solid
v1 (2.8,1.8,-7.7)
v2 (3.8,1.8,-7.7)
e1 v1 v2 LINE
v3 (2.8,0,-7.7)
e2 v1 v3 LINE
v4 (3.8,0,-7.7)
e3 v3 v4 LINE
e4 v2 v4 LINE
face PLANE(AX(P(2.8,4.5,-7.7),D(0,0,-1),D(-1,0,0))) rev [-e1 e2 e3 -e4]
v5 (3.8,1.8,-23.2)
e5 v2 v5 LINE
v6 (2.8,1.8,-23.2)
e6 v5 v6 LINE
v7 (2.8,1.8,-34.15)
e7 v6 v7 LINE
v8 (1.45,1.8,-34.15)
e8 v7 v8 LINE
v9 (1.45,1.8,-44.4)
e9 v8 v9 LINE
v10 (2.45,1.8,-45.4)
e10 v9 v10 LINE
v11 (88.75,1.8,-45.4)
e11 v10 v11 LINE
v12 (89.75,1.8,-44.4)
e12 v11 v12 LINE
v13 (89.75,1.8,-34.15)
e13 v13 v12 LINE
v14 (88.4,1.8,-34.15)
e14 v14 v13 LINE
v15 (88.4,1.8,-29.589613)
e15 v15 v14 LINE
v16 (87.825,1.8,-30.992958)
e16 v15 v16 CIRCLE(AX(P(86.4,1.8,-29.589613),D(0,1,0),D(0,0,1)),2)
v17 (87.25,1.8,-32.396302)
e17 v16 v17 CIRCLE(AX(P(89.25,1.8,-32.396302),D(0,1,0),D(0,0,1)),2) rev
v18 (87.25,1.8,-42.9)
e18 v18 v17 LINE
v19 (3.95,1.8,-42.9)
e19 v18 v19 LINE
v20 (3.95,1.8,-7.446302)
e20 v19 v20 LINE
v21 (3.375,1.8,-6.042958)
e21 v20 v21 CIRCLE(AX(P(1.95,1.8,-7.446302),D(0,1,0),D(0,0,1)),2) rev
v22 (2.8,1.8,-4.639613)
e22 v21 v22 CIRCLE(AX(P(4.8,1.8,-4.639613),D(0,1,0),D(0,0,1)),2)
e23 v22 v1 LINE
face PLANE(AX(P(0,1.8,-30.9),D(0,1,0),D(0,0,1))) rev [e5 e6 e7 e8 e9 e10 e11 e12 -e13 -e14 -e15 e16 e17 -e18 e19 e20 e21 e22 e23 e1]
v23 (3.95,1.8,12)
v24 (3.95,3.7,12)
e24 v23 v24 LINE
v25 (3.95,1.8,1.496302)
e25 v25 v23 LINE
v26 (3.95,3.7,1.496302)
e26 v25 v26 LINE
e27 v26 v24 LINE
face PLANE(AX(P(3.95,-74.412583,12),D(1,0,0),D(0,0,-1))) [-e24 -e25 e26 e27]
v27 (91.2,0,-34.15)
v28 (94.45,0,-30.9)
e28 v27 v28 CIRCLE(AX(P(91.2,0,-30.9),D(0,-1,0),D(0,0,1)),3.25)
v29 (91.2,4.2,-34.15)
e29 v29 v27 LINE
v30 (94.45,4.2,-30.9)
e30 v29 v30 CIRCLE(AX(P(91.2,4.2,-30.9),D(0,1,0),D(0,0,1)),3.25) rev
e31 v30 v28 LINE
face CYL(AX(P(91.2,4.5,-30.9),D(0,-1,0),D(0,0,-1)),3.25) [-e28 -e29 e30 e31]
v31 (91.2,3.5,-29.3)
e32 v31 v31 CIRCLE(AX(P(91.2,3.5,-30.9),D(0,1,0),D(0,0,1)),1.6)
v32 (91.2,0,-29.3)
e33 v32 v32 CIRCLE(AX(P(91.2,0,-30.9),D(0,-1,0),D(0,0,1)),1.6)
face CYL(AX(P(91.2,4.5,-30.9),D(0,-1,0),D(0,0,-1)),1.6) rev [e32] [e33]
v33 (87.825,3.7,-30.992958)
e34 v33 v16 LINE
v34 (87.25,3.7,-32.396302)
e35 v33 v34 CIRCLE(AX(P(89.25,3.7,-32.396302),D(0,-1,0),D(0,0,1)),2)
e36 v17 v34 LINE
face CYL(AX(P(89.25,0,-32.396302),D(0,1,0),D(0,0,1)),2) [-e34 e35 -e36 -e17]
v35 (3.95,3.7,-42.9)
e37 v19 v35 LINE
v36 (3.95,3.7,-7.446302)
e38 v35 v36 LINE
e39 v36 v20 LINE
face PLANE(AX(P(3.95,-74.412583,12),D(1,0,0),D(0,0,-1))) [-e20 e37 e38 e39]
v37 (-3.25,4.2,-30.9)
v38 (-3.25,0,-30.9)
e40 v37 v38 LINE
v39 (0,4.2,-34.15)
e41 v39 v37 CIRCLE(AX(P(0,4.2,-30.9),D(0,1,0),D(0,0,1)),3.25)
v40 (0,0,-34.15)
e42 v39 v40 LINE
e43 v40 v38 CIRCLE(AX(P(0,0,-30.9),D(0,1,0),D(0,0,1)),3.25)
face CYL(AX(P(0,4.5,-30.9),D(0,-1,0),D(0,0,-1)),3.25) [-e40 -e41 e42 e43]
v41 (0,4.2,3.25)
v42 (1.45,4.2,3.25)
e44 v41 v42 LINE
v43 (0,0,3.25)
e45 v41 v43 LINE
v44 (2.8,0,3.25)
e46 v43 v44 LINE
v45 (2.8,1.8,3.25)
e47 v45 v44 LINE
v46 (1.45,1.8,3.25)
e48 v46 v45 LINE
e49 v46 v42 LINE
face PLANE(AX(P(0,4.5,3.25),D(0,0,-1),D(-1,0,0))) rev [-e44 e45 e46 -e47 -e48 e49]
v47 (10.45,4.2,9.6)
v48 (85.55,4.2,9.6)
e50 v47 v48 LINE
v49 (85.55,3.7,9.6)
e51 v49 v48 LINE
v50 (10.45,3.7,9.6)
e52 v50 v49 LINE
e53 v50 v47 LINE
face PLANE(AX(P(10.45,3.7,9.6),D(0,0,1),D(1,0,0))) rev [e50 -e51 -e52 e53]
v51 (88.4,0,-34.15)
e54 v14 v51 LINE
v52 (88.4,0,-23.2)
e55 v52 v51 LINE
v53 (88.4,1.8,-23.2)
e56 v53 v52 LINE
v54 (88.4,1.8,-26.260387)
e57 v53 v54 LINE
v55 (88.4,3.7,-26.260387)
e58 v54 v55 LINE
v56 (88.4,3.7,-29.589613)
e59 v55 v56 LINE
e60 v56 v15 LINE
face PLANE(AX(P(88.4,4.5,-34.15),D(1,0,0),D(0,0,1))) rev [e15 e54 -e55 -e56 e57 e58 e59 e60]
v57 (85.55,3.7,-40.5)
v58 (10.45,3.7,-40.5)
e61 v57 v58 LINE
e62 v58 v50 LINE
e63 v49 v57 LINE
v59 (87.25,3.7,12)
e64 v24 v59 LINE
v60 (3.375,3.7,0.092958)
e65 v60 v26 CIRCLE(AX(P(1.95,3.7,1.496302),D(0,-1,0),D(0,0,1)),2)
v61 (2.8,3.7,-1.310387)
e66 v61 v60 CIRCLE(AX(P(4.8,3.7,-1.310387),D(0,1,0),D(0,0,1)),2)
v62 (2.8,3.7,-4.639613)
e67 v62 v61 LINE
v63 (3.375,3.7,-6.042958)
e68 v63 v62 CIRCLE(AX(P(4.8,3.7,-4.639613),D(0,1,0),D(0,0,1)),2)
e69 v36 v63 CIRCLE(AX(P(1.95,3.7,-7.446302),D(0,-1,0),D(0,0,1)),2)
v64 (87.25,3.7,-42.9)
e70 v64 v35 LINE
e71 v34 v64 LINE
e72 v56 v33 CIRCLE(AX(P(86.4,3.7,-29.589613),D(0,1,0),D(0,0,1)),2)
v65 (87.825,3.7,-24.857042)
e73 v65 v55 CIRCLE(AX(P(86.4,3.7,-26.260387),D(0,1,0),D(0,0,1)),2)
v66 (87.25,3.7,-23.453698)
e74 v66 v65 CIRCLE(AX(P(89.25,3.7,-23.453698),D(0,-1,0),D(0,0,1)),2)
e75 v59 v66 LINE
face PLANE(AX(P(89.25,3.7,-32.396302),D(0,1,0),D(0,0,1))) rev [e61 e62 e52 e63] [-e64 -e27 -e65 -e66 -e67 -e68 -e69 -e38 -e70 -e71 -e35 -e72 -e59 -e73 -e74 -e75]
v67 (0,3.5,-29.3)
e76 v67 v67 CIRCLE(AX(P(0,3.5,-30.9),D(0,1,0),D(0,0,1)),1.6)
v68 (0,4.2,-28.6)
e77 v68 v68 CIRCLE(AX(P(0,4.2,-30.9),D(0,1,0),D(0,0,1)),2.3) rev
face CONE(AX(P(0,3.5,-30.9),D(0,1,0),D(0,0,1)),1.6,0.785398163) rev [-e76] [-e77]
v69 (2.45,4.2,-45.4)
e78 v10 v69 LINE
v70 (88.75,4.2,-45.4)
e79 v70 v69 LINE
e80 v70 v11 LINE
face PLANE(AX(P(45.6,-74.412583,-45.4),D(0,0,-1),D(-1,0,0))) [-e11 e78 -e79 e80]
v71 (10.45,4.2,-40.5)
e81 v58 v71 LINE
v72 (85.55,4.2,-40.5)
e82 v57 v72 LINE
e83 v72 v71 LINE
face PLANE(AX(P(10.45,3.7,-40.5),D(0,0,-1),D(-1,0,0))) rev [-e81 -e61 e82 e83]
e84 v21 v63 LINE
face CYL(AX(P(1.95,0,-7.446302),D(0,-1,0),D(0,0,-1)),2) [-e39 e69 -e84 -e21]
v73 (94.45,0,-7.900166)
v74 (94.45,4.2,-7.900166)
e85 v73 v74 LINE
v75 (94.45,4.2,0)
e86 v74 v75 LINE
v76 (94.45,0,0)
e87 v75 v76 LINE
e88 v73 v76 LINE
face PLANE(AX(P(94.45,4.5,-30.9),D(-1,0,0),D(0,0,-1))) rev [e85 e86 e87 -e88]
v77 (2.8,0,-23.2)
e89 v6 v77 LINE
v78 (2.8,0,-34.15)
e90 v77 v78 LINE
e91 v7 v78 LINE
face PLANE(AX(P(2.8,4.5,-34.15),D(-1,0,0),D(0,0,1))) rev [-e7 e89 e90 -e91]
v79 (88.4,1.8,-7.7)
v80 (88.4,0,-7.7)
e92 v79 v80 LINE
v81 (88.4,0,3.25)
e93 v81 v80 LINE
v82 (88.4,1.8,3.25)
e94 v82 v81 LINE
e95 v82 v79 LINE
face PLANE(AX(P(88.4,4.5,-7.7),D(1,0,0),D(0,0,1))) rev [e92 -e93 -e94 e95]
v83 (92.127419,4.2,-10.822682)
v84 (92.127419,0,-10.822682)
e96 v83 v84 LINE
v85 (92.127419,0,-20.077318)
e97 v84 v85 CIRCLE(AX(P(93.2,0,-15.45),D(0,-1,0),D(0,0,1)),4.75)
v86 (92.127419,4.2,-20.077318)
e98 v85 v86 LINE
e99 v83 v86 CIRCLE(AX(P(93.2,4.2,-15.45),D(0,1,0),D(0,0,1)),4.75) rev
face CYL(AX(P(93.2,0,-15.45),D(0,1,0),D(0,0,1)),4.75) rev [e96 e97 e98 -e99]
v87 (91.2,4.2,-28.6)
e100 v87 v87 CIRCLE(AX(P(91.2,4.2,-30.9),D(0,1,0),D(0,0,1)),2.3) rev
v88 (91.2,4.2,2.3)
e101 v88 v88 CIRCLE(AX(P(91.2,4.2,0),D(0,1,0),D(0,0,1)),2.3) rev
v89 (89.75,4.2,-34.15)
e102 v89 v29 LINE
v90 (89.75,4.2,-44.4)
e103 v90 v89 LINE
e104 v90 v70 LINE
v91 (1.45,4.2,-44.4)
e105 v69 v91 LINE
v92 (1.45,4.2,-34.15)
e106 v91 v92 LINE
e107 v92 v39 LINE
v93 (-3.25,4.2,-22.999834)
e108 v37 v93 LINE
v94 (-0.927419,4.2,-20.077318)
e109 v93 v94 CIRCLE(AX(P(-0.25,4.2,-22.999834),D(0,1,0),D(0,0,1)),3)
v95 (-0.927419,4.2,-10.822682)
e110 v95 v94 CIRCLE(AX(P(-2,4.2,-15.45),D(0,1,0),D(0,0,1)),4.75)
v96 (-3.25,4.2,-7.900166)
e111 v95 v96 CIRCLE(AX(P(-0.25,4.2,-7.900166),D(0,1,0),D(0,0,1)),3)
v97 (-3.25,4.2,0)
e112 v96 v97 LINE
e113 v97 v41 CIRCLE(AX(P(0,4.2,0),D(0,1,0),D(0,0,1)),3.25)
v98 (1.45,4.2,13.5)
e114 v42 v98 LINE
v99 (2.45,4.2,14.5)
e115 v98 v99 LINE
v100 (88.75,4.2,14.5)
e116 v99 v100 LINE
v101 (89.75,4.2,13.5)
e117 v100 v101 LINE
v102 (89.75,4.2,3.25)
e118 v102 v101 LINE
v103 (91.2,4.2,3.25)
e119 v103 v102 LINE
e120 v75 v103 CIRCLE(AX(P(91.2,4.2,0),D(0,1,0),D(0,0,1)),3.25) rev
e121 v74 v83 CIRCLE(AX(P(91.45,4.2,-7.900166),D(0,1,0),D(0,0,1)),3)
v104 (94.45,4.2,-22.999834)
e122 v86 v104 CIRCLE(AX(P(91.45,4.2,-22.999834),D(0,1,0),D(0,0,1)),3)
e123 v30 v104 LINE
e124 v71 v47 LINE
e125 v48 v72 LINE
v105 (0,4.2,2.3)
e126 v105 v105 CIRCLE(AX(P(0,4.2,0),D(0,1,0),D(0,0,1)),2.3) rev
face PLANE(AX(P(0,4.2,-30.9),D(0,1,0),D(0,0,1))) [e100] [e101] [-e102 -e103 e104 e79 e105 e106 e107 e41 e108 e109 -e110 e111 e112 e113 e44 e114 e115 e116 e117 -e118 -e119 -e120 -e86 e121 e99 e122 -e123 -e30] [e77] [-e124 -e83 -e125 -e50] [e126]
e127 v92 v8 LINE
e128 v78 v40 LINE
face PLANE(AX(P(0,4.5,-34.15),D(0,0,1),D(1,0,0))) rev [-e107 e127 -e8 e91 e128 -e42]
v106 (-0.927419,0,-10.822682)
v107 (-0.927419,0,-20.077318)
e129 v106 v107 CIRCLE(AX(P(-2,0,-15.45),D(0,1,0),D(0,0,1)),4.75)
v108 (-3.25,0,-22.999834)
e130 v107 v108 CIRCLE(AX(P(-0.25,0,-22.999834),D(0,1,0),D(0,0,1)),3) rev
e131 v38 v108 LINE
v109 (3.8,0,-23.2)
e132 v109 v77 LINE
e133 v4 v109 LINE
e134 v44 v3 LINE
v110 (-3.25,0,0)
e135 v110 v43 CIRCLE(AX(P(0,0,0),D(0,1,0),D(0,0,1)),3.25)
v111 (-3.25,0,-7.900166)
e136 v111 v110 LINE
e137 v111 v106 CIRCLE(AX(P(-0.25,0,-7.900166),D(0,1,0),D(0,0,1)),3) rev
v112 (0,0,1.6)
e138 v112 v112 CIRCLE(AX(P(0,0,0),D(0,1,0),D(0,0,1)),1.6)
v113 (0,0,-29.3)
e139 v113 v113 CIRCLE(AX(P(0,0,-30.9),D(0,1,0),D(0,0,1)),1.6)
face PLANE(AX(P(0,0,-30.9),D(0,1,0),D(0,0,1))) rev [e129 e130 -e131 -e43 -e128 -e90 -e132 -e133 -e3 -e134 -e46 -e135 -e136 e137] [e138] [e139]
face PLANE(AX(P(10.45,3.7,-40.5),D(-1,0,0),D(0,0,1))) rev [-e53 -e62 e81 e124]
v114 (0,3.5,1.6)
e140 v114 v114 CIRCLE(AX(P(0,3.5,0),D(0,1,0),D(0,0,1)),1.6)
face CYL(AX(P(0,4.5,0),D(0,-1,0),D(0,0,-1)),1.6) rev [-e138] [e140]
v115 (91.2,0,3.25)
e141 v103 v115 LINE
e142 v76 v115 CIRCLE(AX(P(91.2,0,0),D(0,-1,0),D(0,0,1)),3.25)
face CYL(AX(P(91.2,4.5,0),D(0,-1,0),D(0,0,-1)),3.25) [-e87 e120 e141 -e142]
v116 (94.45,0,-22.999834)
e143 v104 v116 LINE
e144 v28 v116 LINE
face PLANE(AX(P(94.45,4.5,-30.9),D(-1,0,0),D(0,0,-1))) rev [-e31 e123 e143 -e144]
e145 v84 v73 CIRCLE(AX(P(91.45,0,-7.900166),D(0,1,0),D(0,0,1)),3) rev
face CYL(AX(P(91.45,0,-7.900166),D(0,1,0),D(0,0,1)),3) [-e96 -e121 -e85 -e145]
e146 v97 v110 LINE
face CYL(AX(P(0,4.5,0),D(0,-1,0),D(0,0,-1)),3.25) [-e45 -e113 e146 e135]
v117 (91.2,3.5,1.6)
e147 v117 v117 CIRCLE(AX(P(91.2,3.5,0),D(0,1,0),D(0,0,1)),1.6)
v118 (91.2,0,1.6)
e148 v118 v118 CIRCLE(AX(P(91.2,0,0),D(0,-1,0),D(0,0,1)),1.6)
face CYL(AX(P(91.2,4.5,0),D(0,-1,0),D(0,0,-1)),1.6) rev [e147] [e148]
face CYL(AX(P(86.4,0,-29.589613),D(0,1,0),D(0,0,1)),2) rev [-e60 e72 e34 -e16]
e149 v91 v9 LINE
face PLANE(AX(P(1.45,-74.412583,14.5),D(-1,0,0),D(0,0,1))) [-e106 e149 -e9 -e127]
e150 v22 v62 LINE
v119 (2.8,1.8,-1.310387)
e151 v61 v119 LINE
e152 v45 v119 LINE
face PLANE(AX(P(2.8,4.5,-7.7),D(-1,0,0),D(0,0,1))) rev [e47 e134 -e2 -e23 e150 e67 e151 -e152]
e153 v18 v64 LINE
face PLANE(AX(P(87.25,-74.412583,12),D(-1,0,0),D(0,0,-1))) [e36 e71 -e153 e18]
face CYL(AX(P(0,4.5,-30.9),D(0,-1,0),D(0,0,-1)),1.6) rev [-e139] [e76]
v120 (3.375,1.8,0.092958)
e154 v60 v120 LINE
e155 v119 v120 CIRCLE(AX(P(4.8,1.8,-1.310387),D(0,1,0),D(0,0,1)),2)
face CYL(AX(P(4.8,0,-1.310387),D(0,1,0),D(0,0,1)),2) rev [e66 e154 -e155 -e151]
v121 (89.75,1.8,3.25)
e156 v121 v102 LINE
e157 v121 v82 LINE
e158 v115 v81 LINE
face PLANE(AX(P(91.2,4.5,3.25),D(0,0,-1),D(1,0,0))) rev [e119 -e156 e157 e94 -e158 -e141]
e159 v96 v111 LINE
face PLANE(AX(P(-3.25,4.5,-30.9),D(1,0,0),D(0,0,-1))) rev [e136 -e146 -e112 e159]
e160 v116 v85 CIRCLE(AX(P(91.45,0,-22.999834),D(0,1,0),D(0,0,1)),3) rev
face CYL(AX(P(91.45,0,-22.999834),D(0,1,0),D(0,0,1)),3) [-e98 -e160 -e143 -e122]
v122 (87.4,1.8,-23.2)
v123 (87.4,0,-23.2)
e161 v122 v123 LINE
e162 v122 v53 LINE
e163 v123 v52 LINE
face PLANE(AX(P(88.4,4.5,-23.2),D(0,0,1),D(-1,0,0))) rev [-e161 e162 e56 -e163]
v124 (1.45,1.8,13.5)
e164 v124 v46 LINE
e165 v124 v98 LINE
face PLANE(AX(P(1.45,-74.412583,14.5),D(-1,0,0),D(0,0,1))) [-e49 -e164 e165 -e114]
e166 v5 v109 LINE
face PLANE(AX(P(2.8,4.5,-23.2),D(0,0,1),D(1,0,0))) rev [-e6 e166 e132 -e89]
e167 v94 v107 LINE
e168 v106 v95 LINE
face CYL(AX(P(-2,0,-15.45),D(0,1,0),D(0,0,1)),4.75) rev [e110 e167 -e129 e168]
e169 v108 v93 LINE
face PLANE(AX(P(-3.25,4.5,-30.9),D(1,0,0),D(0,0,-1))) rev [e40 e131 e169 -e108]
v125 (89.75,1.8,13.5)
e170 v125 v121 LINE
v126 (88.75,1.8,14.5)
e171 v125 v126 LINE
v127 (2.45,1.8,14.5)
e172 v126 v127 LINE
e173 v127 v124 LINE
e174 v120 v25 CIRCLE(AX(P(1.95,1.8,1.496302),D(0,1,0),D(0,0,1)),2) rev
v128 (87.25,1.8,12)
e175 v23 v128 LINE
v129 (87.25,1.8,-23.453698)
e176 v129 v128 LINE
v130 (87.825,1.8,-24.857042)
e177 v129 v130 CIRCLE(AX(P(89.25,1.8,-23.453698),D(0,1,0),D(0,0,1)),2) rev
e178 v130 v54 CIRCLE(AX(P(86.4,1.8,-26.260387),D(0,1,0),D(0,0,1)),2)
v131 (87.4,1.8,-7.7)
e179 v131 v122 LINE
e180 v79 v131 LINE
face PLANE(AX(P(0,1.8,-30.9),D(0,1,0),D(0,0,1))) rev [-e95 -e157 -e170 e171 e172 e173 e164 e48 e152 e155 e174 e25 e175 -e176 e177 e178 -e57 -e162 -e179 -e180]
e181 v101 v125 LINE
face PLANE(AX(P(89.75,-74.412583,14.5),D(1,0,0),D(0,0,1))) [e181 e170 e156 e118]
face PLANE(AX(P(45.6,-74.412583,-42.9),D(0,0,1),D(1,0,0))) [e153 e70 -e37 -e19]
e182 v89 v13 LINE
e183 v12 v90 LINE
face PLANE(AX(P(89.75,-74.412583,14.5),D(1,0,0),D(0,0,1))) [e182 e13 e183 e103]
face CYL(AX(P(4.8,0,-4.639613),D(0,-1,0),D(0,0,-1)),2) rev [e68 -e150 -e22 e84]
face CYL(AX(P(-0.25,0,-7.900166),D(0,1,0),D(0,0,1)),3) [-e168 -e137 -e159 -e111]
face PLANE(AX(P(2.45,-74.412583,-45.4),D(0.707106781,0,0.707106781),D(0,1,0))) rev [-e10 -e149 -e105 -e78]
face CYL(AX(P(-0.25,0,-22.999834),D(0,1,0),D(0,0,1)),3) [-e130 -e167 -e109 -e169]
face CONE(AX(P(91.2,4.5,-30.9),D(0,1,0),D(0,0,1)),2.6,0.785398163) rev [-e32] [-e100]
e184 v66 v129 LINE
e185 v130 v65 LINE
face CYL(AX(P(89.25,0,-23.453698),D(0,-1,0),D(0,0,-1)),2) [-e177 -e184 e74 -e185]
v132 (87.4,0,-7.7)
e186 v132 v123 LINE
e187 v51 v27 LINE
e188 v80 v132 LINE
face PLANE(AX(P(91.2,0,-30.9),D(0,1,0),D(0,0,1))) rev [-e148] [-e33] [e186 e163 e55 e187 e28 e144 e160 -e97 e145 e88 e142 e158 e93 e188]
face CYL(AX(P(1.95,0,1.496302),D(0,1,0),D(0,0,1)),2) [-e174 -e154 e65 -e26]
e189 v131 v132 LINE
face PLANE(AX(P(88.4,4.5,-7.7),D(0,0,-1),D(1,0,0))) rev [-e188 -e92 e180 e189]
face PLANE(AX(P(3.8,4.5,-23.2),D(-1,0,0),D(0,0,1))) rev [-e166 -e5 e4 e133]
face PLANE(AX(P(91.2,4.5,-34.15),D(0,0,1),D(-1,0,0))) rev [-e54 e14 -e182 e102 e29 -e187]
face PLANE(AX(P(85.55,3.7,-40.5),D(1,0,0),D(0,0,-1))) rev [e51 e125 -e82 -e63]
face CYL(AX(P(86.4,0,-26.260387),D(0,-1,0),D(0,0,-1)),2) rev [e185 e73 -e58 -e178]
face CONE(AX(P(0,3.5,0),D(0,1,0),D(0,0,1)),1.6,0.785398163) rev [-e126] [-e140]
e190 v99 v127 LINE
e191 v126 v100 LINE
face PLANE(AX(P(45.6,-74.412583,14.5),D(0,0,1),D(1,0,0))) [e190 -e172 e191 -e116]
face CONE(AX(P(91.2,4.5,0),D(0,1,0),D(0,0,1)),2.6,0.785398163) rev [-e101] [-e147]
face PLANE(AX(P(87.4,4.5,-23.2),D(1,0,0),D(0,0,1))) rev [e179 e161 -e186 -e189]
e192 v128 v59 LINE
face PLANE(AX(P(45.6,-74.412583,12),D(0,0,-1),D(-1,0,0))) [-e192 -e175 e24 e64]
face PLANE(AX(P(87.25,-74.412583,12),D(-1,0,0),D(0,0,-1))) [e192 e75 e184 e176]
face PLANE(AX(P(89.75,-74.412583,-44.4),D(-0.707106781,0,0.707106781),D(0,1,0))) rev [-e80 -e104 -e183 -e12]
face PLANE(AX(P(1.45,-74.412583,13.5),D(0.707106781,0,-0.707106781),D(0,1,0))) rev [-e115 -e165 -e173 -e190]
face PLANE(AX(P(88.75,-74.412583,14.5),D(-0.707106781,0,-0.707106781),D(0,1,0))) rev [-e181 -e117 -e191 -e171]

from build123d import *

# Parameters (mm, degrees)
CROQUIS1_R              = 1.6
SALIENTE_EXTRUIR1_DEPTH = 4.5
SALIENTE_EXTRUIR2_DEPTH = 2.7
CORTAR_EXTRUIR1_DEPTH   = 65.504030882
REDONDEO1_R             = 3
CHAFL_N1_SIZE           = 1
CROQUIS6_W              = 1.15
CROQUIS6_H              = 6.95
CORTAR_EXTRUIR3_DEPTH   = 105.891432104
REDONDEO4_R             = 2
REDONDEO5_R             = 2
CROQUIS7_R              = 1.6
CORTAR_EXTRUIR4_DEPTH   = 105.891432104
CHAFL_N2_SIZE           = 1
CROQUIS8_W              = 75.1
CROQUIS8_H              = 50.1
SALIENTE_EXTRUIR4_DEPTH = 0.8
MOVER_START             = 4.2
MOVER_CARA1_OUTLINE_W   = 75.1
MOVER_CARA1_OUTLINE_H   = 50.1
MOVER_CARA1_DEPTH       = 0.3


# Read off the part's stored shape, not the designer's step: Mover cara1
with BuildPart() as part:
    # Croquis1 → Saliente-Extruir1 (new body)
    with BuildSketch(Plane(origin=(0, 0, 0), x_dir=(1, 0, 0), z_dir=(0, 1, 0))):
        with BuildLine():
            Line((-3.25, 30.9), (-3.25, 0))
            ThreePointArc((-3.25, 0), (-2.298097039, -2.298097039), (0, -3.25))
            Line((0, -3.25), (2.8, -3.25))
            Line((2.8, -3.25), (2.8, 7.7))
            Line((2.8, 7.7), (3.8, 7.7))
            Line((3.8, 7.7), (3.8, 23.2))
            Line((3.8, 23.2), (2.8, 23.2))
            Line((2.8, 23.2), (2.8, 34.15))
            Line((2.8, 34.15), (0, 34.15))
            ThreePointArc((0, 34.15), (-2.298097039, 33.198097039), (-3.25, 30.9))
        make_face()
        with Locations(Location((0, 0, 0), (0, 0, 270))):
            Circle(CROQUIS1_R, mode=Mode.SUBTRACT)
        with Locations(Location((0, 30.9, 0), (0, 0, 270))):
            Circle(CROQUIS1_R, mode=Mode.SUBTRACT)
    extrude(amount=SALIENTE_EXTRUIR1_DEPTH)

    # Croquis2 → Saliente-Extruir2 (add)
    with BuildSketch(Plane(origin=(0, 4.5, 0), x_dir=(1, 0, 0), z_dir=(0, 1, 0))):
        Polygon((45.6, -14.5), (1.45, -14.5), (1.45, 45.4), (45.6, 45.4), (45.6, 42.9), (3.95, 42.9), (3.95, -12), (45.6, -12), align=None)
    extrude(amount=-SALIENTE_EXTRUIR2_DEPTH)

    # Croquis3 → Cortar-Extruir1 (cut, through all)
    with BuildSketch(Plane(origin=(0, 4.5, 0), x_dir=(1, 0, 0), z_dir=(0, 1, 0))):
        with BuildLine():
            Line((-2, 10.7), (-3.25, 10.7))
            Line((-3.25, 10.7), (-3.25, 20.2))
            Line((-3.25, 20.2), (-2, 20.2))
            ThreePointArc((-2, 20.2), (2.75, 15.45), (-2, 10.7))
        make_face()
    extrude(amount=-CORTAR_EXTRUIR1_DEPTH, mode=Mode.SUBTRACT)

    # Simetría1: part across plane


with BuildPart() as part_1:
    add(part.part)
    add(part.part.mirror(Plane(origin=(45.6, -74.412582941, 12), x_dir=(0, 0, 1), z_dir=(1, 0, 0))))

    # Redondeo1
    redondeo1_edges = [part_1.edges().sort_by_distance(p)[0] for p in [
        (94.45, 2.25, -20.2),
        (94.45, 2.25, -10.7),
        (-3.25, 2.25, -20.2),
        (-3.25, 2.25, -10.7),
    ]]
    fillet(redondeo1_edges, radius=REDONDEO1_R)

    # Chaflán1
    chafl_n1_edges = [part_1.edges().sort_by_distance(p)[0] for p in [
        (89.75, 3.15, -45.4),
        (89.75, 3.15, 14.5),
        (1.45, 3.15, 14.5),
        (1.45, 3.15, -45.4),
    ]]
    chamfer(chafl_n1_edges, length=CHAFL_N1_SIZE)

    # Croquis6 → Cortar-Extruir3 (cut, through all)
    with BuildSketch(Plane(origin=(0, 4.5, 0), x_dir=(1, 0, 0), z_dir=(0, 1, 0))):
        with Locations((3.375, 2.975)):
            Rectangle(CROQUIS6_W, CROQUIS6_H)
        with Locations((87.825, 27.925)):
            Rectangle(CROQUIS6_W, CROQUIS6_H)
    extrude(amount=-CORTAR_EXTRUIR3_DEPTH, mode=Mode.SUBTRACT)

    # Redondeo4
    # the kernel refuses this fillet: 2 mm, written as the material it adds along each edge
    with BuildSketch(Plane(origin=(88.4, 4.5, -24.45), x_dir=(0, 0, -1), z_dir=(0, -1, 0)), Plane(origin=(2.8, 4.5, -6.45), x_dir=(0, 0, 1), z_dir=(0, -1, 0))) as redondeo4_piece_1:
        with BuildLine():
            CenterArc((1.810386699, -2), REDONDEO4_R, 90, 64.849336587)
            Line((0, -1.15), (-0.036207734, -1.133))
            ThreePointArc((-0.036207734, -1.133), (-0.04, -0.575), (-0.04, 0))
            Line((-0.04, 0), (0, 0.04))
            Line((0, 0.04), (1.810386699, 0.04))
            Line((1.810386699, 0.04), (1.810386699, 0))
        make_face()
    extrude(amount=2.7)
    with BuildSketch(Plane(origin=(88.4, 4.5, -31.4), x_dir=(-1, 0, 0), z_dir=(0, -1, 0)), Plane(origin=(2.8, 4.5, 0.5), x_dir=(1, 0, 0), z_dir=(0, -1, 0))) as redondeo4_piece_2:
        with BuildLine():
            CenterArc((2, -1.810386699), REDONDEO4_R, 115.150663413, 64.849336587)
            Line((0, -1.810386699), (-0.04, -1.810386699))
            Line((-0.04, -1.810386699), (-0.04, 0))
            Line((-0.04, 0), (0, 0.04))
            ThreePointArc((0, 0.04), (0.575, 0.04), (1.133, 0.036207734))
            Line((1.133, 0.036207734), (1.15, 0))
        make_face()
    extrude(amount=2.7)

    # Redondeo5
    redondeo5_edges = [part_1.edges().sort_by_distance(p)[0] for p in [
        (3.95, 3.15, 0.5),
        (3.95, 3.15, -6.45),
        (87.25, 3.15, -31.4),
        (87.25, 3.15, -24.45),
    ]]
    fillet(redondeo5_edges, radius=REDONDEO5_R)

    # Croquis7 → Cortar-Extruir4 (cut, through all)
    with BuildSketch(Plane.XZ):
        with Locations(Location((0, -30.9, 0), (0, 0, 90))):
            Circle(CROQUIS7_R)
        with Locations(Location((0, 0, 0), (0, 0, 90))):
            Circle(CROQUIS7_R)
        with Locations(Location((91.2, -30.9, 0), (0, 0, 90))):
            Circle(CROQUIS7_R)
        with Locations(Location((91.2, 0, 0), (0, 0, 90))):
            Circle(CROQUIS7_R)
    extrude(amount=-CORTAR_EXTRUIR4_DEPTH, mode=Mode.SUBTRACT)

    # Chaflán2
    chafl_n2_edges = [part_1.edges().sort_by_distance(p)[0] for p in [
        (91.2, 4.5, -32.5),
        (91.2, 4.5, -1.6),
        (0, 4.5, -32.5),
        (0, 4.5, -1.6),
    ]]
    chamfer(chafl_n2_edges, length=CHAFL_N2_SIZE)

    # Croquis8 → Saliente-Extruir4 (add)
    with BuildSketch(Plane(origin=(0, 4.5, 0), x_dir=(1, 0, 0), z_dir=(0, 1, 0))):
        with BuildLine():
            Line((3.95, 42.9), (87.25, 42.9))
            Line((87.25, 42.9), (87.25, 32.396301741))
            ThreePointArc((87.25, 32.396301741), (87.399324448, 31.638014197), (87.825, 30.992957521))
            ThreePointArc((87.825, 30.992957521), (88.250675552, 30.347900845), (88.4, 29.589613301))
            Line((88.4, 29.589613301), (88.4, 26.260386699))
            ThreePointArc((88.4, 26.260386699), (88.250675552, 25.502099155), (87.825, 24.857042479))
            ThreePointArc((87.825, 24.857042479), (87.399324448, 24.211985803), (87.25, 23.453698259))
            Line((87.25, 23.453698259), (87.25, -12))
            Line((87.25, -12), (3.95, -12))
            Line((3.95, -12), (3.95, -1.496301741))
            ThreePointArc((3.95, -1.496301741), (3.800675552, -0.738014197), (3.375, -0.092957521))
            ThreePointArc((3.375, -0.092957521), (2.949324448, 0.552099155), (2.8, 1.310386699))
            Line((2.8, 1.310386699), (2.8, 4.639613301))
            ThreePointArc((2.8, 4.639613301), (2.949324448, 5.397900845), (3.375, 6.042957521))
            ThreePointArc((3.375, 6.042957521), (3.800675552, 6.688014197), (3.95, 7.446301741))
            Line((3.95, 7.446301741), (3.95, 42.9))
        make_face()
        with Locations((48, 15.45)):
            Rectangle(CROQUIS8_W, CROQUIS8_H, mode=Mode.SUBTRACT)
    extrude(amount=-SALIENTE_EXTRUIR4_DEPTH)

    # Mover cara1 outline → Mover cara1 (cut)
    with BuildSketch(Plane(origin=(0, 0, 0), x_dir=(1, 0, 0), z_dir=(0, 1, 0)).offset(MOVER_START)):
        with BuildLine():
            Line((0, -3.25), (1.45, -3.25))
            Line((1.45, -3.25), (1.45, -13.5))
            Line((1.45, -13.5), (2.45, -14.5))
            Line((2.45, -14.5), (88.75, -14.5))
            Line((88.75, -14.5), (89.75, -13.5))
            Line((89.75, -13.5), (89.75, -3.25))
            Line((89.75, -3.25), (91.2, -3.25))
            ThreePointArc((91.2, -3.25), (93.498097039, -2.298097039), (94.45, 0))
            Line((94.45, 0), (94.45, 7.900165565))
            ThreePointArc((94.45, 7.900165565), (93.798644084, 9.766678615), (92.127419355, 10.82268212))
            ThreePointArc((92.127419355, 10.82268212), (88.45, 15.45), (92.127419355, 20.07731788))
            ThreePointArc((92.127419355, 20.07731788), (93.798644084, 21.133321385), (94.45, 22.999834435))
            Line((94.45, 22.999834435), (94.45, 30.9))
            ThreePointArc((94.45, 30.9), (93.498097039, 33.198097039), (91.2, 34.15))
            Line((91.2, 34.15), (89.75, 34.15))
            Line((89.75, 34.15), (89.75, 44.4))
            Line((89.75, 44.4), (88.75, 45.4))
            Line((88.75, 45.4), (2.45, 45.4))
            Line((2.45, 45.4), (1.45, 44.4))
            Line((1.45, 44.4), (1.45, 34.15))
            Line((1.45, 34.15), (0, 34.15))
            ThreePointArc((0, 34.15), (-2.298097039, 33.198097039), (-3.25, 30.9))
            Line((-3.25, 30.9), (-3.25, 22.999834435))
            ThreePointArc((-3.25, 22.999834435), (-2.598644084, 21.133321385), (-0.927419355, 20.07731788))
            ThreePointArc((-0.927419355, 20.07731788), (2.75, 15.45), (-0.927419355, 10.82268212))
            ThreePointArc((-0.927419355, 10.82268212), (-2.598644084, 9.766678615), (-3.25, 7.900165565))
            Line((-3.25, 7.900165565), (-3.25, 0))
            ThreePointArc((-3.25, 0), (-2.298097039, -2.298097039), (0, -3.25))
        make_face()
        with Locations((48, 15.45)):
            Rectangle(MOVER_CARA1_OUTLINE_W, MOVER_CARA1_OUTLINE_H, mode=Mode.SUBTRACT)
    extrude(amount=MOVER_CARA1_DEPTH, mode=Mode.SUBTRACT)


solid = part_1.part
